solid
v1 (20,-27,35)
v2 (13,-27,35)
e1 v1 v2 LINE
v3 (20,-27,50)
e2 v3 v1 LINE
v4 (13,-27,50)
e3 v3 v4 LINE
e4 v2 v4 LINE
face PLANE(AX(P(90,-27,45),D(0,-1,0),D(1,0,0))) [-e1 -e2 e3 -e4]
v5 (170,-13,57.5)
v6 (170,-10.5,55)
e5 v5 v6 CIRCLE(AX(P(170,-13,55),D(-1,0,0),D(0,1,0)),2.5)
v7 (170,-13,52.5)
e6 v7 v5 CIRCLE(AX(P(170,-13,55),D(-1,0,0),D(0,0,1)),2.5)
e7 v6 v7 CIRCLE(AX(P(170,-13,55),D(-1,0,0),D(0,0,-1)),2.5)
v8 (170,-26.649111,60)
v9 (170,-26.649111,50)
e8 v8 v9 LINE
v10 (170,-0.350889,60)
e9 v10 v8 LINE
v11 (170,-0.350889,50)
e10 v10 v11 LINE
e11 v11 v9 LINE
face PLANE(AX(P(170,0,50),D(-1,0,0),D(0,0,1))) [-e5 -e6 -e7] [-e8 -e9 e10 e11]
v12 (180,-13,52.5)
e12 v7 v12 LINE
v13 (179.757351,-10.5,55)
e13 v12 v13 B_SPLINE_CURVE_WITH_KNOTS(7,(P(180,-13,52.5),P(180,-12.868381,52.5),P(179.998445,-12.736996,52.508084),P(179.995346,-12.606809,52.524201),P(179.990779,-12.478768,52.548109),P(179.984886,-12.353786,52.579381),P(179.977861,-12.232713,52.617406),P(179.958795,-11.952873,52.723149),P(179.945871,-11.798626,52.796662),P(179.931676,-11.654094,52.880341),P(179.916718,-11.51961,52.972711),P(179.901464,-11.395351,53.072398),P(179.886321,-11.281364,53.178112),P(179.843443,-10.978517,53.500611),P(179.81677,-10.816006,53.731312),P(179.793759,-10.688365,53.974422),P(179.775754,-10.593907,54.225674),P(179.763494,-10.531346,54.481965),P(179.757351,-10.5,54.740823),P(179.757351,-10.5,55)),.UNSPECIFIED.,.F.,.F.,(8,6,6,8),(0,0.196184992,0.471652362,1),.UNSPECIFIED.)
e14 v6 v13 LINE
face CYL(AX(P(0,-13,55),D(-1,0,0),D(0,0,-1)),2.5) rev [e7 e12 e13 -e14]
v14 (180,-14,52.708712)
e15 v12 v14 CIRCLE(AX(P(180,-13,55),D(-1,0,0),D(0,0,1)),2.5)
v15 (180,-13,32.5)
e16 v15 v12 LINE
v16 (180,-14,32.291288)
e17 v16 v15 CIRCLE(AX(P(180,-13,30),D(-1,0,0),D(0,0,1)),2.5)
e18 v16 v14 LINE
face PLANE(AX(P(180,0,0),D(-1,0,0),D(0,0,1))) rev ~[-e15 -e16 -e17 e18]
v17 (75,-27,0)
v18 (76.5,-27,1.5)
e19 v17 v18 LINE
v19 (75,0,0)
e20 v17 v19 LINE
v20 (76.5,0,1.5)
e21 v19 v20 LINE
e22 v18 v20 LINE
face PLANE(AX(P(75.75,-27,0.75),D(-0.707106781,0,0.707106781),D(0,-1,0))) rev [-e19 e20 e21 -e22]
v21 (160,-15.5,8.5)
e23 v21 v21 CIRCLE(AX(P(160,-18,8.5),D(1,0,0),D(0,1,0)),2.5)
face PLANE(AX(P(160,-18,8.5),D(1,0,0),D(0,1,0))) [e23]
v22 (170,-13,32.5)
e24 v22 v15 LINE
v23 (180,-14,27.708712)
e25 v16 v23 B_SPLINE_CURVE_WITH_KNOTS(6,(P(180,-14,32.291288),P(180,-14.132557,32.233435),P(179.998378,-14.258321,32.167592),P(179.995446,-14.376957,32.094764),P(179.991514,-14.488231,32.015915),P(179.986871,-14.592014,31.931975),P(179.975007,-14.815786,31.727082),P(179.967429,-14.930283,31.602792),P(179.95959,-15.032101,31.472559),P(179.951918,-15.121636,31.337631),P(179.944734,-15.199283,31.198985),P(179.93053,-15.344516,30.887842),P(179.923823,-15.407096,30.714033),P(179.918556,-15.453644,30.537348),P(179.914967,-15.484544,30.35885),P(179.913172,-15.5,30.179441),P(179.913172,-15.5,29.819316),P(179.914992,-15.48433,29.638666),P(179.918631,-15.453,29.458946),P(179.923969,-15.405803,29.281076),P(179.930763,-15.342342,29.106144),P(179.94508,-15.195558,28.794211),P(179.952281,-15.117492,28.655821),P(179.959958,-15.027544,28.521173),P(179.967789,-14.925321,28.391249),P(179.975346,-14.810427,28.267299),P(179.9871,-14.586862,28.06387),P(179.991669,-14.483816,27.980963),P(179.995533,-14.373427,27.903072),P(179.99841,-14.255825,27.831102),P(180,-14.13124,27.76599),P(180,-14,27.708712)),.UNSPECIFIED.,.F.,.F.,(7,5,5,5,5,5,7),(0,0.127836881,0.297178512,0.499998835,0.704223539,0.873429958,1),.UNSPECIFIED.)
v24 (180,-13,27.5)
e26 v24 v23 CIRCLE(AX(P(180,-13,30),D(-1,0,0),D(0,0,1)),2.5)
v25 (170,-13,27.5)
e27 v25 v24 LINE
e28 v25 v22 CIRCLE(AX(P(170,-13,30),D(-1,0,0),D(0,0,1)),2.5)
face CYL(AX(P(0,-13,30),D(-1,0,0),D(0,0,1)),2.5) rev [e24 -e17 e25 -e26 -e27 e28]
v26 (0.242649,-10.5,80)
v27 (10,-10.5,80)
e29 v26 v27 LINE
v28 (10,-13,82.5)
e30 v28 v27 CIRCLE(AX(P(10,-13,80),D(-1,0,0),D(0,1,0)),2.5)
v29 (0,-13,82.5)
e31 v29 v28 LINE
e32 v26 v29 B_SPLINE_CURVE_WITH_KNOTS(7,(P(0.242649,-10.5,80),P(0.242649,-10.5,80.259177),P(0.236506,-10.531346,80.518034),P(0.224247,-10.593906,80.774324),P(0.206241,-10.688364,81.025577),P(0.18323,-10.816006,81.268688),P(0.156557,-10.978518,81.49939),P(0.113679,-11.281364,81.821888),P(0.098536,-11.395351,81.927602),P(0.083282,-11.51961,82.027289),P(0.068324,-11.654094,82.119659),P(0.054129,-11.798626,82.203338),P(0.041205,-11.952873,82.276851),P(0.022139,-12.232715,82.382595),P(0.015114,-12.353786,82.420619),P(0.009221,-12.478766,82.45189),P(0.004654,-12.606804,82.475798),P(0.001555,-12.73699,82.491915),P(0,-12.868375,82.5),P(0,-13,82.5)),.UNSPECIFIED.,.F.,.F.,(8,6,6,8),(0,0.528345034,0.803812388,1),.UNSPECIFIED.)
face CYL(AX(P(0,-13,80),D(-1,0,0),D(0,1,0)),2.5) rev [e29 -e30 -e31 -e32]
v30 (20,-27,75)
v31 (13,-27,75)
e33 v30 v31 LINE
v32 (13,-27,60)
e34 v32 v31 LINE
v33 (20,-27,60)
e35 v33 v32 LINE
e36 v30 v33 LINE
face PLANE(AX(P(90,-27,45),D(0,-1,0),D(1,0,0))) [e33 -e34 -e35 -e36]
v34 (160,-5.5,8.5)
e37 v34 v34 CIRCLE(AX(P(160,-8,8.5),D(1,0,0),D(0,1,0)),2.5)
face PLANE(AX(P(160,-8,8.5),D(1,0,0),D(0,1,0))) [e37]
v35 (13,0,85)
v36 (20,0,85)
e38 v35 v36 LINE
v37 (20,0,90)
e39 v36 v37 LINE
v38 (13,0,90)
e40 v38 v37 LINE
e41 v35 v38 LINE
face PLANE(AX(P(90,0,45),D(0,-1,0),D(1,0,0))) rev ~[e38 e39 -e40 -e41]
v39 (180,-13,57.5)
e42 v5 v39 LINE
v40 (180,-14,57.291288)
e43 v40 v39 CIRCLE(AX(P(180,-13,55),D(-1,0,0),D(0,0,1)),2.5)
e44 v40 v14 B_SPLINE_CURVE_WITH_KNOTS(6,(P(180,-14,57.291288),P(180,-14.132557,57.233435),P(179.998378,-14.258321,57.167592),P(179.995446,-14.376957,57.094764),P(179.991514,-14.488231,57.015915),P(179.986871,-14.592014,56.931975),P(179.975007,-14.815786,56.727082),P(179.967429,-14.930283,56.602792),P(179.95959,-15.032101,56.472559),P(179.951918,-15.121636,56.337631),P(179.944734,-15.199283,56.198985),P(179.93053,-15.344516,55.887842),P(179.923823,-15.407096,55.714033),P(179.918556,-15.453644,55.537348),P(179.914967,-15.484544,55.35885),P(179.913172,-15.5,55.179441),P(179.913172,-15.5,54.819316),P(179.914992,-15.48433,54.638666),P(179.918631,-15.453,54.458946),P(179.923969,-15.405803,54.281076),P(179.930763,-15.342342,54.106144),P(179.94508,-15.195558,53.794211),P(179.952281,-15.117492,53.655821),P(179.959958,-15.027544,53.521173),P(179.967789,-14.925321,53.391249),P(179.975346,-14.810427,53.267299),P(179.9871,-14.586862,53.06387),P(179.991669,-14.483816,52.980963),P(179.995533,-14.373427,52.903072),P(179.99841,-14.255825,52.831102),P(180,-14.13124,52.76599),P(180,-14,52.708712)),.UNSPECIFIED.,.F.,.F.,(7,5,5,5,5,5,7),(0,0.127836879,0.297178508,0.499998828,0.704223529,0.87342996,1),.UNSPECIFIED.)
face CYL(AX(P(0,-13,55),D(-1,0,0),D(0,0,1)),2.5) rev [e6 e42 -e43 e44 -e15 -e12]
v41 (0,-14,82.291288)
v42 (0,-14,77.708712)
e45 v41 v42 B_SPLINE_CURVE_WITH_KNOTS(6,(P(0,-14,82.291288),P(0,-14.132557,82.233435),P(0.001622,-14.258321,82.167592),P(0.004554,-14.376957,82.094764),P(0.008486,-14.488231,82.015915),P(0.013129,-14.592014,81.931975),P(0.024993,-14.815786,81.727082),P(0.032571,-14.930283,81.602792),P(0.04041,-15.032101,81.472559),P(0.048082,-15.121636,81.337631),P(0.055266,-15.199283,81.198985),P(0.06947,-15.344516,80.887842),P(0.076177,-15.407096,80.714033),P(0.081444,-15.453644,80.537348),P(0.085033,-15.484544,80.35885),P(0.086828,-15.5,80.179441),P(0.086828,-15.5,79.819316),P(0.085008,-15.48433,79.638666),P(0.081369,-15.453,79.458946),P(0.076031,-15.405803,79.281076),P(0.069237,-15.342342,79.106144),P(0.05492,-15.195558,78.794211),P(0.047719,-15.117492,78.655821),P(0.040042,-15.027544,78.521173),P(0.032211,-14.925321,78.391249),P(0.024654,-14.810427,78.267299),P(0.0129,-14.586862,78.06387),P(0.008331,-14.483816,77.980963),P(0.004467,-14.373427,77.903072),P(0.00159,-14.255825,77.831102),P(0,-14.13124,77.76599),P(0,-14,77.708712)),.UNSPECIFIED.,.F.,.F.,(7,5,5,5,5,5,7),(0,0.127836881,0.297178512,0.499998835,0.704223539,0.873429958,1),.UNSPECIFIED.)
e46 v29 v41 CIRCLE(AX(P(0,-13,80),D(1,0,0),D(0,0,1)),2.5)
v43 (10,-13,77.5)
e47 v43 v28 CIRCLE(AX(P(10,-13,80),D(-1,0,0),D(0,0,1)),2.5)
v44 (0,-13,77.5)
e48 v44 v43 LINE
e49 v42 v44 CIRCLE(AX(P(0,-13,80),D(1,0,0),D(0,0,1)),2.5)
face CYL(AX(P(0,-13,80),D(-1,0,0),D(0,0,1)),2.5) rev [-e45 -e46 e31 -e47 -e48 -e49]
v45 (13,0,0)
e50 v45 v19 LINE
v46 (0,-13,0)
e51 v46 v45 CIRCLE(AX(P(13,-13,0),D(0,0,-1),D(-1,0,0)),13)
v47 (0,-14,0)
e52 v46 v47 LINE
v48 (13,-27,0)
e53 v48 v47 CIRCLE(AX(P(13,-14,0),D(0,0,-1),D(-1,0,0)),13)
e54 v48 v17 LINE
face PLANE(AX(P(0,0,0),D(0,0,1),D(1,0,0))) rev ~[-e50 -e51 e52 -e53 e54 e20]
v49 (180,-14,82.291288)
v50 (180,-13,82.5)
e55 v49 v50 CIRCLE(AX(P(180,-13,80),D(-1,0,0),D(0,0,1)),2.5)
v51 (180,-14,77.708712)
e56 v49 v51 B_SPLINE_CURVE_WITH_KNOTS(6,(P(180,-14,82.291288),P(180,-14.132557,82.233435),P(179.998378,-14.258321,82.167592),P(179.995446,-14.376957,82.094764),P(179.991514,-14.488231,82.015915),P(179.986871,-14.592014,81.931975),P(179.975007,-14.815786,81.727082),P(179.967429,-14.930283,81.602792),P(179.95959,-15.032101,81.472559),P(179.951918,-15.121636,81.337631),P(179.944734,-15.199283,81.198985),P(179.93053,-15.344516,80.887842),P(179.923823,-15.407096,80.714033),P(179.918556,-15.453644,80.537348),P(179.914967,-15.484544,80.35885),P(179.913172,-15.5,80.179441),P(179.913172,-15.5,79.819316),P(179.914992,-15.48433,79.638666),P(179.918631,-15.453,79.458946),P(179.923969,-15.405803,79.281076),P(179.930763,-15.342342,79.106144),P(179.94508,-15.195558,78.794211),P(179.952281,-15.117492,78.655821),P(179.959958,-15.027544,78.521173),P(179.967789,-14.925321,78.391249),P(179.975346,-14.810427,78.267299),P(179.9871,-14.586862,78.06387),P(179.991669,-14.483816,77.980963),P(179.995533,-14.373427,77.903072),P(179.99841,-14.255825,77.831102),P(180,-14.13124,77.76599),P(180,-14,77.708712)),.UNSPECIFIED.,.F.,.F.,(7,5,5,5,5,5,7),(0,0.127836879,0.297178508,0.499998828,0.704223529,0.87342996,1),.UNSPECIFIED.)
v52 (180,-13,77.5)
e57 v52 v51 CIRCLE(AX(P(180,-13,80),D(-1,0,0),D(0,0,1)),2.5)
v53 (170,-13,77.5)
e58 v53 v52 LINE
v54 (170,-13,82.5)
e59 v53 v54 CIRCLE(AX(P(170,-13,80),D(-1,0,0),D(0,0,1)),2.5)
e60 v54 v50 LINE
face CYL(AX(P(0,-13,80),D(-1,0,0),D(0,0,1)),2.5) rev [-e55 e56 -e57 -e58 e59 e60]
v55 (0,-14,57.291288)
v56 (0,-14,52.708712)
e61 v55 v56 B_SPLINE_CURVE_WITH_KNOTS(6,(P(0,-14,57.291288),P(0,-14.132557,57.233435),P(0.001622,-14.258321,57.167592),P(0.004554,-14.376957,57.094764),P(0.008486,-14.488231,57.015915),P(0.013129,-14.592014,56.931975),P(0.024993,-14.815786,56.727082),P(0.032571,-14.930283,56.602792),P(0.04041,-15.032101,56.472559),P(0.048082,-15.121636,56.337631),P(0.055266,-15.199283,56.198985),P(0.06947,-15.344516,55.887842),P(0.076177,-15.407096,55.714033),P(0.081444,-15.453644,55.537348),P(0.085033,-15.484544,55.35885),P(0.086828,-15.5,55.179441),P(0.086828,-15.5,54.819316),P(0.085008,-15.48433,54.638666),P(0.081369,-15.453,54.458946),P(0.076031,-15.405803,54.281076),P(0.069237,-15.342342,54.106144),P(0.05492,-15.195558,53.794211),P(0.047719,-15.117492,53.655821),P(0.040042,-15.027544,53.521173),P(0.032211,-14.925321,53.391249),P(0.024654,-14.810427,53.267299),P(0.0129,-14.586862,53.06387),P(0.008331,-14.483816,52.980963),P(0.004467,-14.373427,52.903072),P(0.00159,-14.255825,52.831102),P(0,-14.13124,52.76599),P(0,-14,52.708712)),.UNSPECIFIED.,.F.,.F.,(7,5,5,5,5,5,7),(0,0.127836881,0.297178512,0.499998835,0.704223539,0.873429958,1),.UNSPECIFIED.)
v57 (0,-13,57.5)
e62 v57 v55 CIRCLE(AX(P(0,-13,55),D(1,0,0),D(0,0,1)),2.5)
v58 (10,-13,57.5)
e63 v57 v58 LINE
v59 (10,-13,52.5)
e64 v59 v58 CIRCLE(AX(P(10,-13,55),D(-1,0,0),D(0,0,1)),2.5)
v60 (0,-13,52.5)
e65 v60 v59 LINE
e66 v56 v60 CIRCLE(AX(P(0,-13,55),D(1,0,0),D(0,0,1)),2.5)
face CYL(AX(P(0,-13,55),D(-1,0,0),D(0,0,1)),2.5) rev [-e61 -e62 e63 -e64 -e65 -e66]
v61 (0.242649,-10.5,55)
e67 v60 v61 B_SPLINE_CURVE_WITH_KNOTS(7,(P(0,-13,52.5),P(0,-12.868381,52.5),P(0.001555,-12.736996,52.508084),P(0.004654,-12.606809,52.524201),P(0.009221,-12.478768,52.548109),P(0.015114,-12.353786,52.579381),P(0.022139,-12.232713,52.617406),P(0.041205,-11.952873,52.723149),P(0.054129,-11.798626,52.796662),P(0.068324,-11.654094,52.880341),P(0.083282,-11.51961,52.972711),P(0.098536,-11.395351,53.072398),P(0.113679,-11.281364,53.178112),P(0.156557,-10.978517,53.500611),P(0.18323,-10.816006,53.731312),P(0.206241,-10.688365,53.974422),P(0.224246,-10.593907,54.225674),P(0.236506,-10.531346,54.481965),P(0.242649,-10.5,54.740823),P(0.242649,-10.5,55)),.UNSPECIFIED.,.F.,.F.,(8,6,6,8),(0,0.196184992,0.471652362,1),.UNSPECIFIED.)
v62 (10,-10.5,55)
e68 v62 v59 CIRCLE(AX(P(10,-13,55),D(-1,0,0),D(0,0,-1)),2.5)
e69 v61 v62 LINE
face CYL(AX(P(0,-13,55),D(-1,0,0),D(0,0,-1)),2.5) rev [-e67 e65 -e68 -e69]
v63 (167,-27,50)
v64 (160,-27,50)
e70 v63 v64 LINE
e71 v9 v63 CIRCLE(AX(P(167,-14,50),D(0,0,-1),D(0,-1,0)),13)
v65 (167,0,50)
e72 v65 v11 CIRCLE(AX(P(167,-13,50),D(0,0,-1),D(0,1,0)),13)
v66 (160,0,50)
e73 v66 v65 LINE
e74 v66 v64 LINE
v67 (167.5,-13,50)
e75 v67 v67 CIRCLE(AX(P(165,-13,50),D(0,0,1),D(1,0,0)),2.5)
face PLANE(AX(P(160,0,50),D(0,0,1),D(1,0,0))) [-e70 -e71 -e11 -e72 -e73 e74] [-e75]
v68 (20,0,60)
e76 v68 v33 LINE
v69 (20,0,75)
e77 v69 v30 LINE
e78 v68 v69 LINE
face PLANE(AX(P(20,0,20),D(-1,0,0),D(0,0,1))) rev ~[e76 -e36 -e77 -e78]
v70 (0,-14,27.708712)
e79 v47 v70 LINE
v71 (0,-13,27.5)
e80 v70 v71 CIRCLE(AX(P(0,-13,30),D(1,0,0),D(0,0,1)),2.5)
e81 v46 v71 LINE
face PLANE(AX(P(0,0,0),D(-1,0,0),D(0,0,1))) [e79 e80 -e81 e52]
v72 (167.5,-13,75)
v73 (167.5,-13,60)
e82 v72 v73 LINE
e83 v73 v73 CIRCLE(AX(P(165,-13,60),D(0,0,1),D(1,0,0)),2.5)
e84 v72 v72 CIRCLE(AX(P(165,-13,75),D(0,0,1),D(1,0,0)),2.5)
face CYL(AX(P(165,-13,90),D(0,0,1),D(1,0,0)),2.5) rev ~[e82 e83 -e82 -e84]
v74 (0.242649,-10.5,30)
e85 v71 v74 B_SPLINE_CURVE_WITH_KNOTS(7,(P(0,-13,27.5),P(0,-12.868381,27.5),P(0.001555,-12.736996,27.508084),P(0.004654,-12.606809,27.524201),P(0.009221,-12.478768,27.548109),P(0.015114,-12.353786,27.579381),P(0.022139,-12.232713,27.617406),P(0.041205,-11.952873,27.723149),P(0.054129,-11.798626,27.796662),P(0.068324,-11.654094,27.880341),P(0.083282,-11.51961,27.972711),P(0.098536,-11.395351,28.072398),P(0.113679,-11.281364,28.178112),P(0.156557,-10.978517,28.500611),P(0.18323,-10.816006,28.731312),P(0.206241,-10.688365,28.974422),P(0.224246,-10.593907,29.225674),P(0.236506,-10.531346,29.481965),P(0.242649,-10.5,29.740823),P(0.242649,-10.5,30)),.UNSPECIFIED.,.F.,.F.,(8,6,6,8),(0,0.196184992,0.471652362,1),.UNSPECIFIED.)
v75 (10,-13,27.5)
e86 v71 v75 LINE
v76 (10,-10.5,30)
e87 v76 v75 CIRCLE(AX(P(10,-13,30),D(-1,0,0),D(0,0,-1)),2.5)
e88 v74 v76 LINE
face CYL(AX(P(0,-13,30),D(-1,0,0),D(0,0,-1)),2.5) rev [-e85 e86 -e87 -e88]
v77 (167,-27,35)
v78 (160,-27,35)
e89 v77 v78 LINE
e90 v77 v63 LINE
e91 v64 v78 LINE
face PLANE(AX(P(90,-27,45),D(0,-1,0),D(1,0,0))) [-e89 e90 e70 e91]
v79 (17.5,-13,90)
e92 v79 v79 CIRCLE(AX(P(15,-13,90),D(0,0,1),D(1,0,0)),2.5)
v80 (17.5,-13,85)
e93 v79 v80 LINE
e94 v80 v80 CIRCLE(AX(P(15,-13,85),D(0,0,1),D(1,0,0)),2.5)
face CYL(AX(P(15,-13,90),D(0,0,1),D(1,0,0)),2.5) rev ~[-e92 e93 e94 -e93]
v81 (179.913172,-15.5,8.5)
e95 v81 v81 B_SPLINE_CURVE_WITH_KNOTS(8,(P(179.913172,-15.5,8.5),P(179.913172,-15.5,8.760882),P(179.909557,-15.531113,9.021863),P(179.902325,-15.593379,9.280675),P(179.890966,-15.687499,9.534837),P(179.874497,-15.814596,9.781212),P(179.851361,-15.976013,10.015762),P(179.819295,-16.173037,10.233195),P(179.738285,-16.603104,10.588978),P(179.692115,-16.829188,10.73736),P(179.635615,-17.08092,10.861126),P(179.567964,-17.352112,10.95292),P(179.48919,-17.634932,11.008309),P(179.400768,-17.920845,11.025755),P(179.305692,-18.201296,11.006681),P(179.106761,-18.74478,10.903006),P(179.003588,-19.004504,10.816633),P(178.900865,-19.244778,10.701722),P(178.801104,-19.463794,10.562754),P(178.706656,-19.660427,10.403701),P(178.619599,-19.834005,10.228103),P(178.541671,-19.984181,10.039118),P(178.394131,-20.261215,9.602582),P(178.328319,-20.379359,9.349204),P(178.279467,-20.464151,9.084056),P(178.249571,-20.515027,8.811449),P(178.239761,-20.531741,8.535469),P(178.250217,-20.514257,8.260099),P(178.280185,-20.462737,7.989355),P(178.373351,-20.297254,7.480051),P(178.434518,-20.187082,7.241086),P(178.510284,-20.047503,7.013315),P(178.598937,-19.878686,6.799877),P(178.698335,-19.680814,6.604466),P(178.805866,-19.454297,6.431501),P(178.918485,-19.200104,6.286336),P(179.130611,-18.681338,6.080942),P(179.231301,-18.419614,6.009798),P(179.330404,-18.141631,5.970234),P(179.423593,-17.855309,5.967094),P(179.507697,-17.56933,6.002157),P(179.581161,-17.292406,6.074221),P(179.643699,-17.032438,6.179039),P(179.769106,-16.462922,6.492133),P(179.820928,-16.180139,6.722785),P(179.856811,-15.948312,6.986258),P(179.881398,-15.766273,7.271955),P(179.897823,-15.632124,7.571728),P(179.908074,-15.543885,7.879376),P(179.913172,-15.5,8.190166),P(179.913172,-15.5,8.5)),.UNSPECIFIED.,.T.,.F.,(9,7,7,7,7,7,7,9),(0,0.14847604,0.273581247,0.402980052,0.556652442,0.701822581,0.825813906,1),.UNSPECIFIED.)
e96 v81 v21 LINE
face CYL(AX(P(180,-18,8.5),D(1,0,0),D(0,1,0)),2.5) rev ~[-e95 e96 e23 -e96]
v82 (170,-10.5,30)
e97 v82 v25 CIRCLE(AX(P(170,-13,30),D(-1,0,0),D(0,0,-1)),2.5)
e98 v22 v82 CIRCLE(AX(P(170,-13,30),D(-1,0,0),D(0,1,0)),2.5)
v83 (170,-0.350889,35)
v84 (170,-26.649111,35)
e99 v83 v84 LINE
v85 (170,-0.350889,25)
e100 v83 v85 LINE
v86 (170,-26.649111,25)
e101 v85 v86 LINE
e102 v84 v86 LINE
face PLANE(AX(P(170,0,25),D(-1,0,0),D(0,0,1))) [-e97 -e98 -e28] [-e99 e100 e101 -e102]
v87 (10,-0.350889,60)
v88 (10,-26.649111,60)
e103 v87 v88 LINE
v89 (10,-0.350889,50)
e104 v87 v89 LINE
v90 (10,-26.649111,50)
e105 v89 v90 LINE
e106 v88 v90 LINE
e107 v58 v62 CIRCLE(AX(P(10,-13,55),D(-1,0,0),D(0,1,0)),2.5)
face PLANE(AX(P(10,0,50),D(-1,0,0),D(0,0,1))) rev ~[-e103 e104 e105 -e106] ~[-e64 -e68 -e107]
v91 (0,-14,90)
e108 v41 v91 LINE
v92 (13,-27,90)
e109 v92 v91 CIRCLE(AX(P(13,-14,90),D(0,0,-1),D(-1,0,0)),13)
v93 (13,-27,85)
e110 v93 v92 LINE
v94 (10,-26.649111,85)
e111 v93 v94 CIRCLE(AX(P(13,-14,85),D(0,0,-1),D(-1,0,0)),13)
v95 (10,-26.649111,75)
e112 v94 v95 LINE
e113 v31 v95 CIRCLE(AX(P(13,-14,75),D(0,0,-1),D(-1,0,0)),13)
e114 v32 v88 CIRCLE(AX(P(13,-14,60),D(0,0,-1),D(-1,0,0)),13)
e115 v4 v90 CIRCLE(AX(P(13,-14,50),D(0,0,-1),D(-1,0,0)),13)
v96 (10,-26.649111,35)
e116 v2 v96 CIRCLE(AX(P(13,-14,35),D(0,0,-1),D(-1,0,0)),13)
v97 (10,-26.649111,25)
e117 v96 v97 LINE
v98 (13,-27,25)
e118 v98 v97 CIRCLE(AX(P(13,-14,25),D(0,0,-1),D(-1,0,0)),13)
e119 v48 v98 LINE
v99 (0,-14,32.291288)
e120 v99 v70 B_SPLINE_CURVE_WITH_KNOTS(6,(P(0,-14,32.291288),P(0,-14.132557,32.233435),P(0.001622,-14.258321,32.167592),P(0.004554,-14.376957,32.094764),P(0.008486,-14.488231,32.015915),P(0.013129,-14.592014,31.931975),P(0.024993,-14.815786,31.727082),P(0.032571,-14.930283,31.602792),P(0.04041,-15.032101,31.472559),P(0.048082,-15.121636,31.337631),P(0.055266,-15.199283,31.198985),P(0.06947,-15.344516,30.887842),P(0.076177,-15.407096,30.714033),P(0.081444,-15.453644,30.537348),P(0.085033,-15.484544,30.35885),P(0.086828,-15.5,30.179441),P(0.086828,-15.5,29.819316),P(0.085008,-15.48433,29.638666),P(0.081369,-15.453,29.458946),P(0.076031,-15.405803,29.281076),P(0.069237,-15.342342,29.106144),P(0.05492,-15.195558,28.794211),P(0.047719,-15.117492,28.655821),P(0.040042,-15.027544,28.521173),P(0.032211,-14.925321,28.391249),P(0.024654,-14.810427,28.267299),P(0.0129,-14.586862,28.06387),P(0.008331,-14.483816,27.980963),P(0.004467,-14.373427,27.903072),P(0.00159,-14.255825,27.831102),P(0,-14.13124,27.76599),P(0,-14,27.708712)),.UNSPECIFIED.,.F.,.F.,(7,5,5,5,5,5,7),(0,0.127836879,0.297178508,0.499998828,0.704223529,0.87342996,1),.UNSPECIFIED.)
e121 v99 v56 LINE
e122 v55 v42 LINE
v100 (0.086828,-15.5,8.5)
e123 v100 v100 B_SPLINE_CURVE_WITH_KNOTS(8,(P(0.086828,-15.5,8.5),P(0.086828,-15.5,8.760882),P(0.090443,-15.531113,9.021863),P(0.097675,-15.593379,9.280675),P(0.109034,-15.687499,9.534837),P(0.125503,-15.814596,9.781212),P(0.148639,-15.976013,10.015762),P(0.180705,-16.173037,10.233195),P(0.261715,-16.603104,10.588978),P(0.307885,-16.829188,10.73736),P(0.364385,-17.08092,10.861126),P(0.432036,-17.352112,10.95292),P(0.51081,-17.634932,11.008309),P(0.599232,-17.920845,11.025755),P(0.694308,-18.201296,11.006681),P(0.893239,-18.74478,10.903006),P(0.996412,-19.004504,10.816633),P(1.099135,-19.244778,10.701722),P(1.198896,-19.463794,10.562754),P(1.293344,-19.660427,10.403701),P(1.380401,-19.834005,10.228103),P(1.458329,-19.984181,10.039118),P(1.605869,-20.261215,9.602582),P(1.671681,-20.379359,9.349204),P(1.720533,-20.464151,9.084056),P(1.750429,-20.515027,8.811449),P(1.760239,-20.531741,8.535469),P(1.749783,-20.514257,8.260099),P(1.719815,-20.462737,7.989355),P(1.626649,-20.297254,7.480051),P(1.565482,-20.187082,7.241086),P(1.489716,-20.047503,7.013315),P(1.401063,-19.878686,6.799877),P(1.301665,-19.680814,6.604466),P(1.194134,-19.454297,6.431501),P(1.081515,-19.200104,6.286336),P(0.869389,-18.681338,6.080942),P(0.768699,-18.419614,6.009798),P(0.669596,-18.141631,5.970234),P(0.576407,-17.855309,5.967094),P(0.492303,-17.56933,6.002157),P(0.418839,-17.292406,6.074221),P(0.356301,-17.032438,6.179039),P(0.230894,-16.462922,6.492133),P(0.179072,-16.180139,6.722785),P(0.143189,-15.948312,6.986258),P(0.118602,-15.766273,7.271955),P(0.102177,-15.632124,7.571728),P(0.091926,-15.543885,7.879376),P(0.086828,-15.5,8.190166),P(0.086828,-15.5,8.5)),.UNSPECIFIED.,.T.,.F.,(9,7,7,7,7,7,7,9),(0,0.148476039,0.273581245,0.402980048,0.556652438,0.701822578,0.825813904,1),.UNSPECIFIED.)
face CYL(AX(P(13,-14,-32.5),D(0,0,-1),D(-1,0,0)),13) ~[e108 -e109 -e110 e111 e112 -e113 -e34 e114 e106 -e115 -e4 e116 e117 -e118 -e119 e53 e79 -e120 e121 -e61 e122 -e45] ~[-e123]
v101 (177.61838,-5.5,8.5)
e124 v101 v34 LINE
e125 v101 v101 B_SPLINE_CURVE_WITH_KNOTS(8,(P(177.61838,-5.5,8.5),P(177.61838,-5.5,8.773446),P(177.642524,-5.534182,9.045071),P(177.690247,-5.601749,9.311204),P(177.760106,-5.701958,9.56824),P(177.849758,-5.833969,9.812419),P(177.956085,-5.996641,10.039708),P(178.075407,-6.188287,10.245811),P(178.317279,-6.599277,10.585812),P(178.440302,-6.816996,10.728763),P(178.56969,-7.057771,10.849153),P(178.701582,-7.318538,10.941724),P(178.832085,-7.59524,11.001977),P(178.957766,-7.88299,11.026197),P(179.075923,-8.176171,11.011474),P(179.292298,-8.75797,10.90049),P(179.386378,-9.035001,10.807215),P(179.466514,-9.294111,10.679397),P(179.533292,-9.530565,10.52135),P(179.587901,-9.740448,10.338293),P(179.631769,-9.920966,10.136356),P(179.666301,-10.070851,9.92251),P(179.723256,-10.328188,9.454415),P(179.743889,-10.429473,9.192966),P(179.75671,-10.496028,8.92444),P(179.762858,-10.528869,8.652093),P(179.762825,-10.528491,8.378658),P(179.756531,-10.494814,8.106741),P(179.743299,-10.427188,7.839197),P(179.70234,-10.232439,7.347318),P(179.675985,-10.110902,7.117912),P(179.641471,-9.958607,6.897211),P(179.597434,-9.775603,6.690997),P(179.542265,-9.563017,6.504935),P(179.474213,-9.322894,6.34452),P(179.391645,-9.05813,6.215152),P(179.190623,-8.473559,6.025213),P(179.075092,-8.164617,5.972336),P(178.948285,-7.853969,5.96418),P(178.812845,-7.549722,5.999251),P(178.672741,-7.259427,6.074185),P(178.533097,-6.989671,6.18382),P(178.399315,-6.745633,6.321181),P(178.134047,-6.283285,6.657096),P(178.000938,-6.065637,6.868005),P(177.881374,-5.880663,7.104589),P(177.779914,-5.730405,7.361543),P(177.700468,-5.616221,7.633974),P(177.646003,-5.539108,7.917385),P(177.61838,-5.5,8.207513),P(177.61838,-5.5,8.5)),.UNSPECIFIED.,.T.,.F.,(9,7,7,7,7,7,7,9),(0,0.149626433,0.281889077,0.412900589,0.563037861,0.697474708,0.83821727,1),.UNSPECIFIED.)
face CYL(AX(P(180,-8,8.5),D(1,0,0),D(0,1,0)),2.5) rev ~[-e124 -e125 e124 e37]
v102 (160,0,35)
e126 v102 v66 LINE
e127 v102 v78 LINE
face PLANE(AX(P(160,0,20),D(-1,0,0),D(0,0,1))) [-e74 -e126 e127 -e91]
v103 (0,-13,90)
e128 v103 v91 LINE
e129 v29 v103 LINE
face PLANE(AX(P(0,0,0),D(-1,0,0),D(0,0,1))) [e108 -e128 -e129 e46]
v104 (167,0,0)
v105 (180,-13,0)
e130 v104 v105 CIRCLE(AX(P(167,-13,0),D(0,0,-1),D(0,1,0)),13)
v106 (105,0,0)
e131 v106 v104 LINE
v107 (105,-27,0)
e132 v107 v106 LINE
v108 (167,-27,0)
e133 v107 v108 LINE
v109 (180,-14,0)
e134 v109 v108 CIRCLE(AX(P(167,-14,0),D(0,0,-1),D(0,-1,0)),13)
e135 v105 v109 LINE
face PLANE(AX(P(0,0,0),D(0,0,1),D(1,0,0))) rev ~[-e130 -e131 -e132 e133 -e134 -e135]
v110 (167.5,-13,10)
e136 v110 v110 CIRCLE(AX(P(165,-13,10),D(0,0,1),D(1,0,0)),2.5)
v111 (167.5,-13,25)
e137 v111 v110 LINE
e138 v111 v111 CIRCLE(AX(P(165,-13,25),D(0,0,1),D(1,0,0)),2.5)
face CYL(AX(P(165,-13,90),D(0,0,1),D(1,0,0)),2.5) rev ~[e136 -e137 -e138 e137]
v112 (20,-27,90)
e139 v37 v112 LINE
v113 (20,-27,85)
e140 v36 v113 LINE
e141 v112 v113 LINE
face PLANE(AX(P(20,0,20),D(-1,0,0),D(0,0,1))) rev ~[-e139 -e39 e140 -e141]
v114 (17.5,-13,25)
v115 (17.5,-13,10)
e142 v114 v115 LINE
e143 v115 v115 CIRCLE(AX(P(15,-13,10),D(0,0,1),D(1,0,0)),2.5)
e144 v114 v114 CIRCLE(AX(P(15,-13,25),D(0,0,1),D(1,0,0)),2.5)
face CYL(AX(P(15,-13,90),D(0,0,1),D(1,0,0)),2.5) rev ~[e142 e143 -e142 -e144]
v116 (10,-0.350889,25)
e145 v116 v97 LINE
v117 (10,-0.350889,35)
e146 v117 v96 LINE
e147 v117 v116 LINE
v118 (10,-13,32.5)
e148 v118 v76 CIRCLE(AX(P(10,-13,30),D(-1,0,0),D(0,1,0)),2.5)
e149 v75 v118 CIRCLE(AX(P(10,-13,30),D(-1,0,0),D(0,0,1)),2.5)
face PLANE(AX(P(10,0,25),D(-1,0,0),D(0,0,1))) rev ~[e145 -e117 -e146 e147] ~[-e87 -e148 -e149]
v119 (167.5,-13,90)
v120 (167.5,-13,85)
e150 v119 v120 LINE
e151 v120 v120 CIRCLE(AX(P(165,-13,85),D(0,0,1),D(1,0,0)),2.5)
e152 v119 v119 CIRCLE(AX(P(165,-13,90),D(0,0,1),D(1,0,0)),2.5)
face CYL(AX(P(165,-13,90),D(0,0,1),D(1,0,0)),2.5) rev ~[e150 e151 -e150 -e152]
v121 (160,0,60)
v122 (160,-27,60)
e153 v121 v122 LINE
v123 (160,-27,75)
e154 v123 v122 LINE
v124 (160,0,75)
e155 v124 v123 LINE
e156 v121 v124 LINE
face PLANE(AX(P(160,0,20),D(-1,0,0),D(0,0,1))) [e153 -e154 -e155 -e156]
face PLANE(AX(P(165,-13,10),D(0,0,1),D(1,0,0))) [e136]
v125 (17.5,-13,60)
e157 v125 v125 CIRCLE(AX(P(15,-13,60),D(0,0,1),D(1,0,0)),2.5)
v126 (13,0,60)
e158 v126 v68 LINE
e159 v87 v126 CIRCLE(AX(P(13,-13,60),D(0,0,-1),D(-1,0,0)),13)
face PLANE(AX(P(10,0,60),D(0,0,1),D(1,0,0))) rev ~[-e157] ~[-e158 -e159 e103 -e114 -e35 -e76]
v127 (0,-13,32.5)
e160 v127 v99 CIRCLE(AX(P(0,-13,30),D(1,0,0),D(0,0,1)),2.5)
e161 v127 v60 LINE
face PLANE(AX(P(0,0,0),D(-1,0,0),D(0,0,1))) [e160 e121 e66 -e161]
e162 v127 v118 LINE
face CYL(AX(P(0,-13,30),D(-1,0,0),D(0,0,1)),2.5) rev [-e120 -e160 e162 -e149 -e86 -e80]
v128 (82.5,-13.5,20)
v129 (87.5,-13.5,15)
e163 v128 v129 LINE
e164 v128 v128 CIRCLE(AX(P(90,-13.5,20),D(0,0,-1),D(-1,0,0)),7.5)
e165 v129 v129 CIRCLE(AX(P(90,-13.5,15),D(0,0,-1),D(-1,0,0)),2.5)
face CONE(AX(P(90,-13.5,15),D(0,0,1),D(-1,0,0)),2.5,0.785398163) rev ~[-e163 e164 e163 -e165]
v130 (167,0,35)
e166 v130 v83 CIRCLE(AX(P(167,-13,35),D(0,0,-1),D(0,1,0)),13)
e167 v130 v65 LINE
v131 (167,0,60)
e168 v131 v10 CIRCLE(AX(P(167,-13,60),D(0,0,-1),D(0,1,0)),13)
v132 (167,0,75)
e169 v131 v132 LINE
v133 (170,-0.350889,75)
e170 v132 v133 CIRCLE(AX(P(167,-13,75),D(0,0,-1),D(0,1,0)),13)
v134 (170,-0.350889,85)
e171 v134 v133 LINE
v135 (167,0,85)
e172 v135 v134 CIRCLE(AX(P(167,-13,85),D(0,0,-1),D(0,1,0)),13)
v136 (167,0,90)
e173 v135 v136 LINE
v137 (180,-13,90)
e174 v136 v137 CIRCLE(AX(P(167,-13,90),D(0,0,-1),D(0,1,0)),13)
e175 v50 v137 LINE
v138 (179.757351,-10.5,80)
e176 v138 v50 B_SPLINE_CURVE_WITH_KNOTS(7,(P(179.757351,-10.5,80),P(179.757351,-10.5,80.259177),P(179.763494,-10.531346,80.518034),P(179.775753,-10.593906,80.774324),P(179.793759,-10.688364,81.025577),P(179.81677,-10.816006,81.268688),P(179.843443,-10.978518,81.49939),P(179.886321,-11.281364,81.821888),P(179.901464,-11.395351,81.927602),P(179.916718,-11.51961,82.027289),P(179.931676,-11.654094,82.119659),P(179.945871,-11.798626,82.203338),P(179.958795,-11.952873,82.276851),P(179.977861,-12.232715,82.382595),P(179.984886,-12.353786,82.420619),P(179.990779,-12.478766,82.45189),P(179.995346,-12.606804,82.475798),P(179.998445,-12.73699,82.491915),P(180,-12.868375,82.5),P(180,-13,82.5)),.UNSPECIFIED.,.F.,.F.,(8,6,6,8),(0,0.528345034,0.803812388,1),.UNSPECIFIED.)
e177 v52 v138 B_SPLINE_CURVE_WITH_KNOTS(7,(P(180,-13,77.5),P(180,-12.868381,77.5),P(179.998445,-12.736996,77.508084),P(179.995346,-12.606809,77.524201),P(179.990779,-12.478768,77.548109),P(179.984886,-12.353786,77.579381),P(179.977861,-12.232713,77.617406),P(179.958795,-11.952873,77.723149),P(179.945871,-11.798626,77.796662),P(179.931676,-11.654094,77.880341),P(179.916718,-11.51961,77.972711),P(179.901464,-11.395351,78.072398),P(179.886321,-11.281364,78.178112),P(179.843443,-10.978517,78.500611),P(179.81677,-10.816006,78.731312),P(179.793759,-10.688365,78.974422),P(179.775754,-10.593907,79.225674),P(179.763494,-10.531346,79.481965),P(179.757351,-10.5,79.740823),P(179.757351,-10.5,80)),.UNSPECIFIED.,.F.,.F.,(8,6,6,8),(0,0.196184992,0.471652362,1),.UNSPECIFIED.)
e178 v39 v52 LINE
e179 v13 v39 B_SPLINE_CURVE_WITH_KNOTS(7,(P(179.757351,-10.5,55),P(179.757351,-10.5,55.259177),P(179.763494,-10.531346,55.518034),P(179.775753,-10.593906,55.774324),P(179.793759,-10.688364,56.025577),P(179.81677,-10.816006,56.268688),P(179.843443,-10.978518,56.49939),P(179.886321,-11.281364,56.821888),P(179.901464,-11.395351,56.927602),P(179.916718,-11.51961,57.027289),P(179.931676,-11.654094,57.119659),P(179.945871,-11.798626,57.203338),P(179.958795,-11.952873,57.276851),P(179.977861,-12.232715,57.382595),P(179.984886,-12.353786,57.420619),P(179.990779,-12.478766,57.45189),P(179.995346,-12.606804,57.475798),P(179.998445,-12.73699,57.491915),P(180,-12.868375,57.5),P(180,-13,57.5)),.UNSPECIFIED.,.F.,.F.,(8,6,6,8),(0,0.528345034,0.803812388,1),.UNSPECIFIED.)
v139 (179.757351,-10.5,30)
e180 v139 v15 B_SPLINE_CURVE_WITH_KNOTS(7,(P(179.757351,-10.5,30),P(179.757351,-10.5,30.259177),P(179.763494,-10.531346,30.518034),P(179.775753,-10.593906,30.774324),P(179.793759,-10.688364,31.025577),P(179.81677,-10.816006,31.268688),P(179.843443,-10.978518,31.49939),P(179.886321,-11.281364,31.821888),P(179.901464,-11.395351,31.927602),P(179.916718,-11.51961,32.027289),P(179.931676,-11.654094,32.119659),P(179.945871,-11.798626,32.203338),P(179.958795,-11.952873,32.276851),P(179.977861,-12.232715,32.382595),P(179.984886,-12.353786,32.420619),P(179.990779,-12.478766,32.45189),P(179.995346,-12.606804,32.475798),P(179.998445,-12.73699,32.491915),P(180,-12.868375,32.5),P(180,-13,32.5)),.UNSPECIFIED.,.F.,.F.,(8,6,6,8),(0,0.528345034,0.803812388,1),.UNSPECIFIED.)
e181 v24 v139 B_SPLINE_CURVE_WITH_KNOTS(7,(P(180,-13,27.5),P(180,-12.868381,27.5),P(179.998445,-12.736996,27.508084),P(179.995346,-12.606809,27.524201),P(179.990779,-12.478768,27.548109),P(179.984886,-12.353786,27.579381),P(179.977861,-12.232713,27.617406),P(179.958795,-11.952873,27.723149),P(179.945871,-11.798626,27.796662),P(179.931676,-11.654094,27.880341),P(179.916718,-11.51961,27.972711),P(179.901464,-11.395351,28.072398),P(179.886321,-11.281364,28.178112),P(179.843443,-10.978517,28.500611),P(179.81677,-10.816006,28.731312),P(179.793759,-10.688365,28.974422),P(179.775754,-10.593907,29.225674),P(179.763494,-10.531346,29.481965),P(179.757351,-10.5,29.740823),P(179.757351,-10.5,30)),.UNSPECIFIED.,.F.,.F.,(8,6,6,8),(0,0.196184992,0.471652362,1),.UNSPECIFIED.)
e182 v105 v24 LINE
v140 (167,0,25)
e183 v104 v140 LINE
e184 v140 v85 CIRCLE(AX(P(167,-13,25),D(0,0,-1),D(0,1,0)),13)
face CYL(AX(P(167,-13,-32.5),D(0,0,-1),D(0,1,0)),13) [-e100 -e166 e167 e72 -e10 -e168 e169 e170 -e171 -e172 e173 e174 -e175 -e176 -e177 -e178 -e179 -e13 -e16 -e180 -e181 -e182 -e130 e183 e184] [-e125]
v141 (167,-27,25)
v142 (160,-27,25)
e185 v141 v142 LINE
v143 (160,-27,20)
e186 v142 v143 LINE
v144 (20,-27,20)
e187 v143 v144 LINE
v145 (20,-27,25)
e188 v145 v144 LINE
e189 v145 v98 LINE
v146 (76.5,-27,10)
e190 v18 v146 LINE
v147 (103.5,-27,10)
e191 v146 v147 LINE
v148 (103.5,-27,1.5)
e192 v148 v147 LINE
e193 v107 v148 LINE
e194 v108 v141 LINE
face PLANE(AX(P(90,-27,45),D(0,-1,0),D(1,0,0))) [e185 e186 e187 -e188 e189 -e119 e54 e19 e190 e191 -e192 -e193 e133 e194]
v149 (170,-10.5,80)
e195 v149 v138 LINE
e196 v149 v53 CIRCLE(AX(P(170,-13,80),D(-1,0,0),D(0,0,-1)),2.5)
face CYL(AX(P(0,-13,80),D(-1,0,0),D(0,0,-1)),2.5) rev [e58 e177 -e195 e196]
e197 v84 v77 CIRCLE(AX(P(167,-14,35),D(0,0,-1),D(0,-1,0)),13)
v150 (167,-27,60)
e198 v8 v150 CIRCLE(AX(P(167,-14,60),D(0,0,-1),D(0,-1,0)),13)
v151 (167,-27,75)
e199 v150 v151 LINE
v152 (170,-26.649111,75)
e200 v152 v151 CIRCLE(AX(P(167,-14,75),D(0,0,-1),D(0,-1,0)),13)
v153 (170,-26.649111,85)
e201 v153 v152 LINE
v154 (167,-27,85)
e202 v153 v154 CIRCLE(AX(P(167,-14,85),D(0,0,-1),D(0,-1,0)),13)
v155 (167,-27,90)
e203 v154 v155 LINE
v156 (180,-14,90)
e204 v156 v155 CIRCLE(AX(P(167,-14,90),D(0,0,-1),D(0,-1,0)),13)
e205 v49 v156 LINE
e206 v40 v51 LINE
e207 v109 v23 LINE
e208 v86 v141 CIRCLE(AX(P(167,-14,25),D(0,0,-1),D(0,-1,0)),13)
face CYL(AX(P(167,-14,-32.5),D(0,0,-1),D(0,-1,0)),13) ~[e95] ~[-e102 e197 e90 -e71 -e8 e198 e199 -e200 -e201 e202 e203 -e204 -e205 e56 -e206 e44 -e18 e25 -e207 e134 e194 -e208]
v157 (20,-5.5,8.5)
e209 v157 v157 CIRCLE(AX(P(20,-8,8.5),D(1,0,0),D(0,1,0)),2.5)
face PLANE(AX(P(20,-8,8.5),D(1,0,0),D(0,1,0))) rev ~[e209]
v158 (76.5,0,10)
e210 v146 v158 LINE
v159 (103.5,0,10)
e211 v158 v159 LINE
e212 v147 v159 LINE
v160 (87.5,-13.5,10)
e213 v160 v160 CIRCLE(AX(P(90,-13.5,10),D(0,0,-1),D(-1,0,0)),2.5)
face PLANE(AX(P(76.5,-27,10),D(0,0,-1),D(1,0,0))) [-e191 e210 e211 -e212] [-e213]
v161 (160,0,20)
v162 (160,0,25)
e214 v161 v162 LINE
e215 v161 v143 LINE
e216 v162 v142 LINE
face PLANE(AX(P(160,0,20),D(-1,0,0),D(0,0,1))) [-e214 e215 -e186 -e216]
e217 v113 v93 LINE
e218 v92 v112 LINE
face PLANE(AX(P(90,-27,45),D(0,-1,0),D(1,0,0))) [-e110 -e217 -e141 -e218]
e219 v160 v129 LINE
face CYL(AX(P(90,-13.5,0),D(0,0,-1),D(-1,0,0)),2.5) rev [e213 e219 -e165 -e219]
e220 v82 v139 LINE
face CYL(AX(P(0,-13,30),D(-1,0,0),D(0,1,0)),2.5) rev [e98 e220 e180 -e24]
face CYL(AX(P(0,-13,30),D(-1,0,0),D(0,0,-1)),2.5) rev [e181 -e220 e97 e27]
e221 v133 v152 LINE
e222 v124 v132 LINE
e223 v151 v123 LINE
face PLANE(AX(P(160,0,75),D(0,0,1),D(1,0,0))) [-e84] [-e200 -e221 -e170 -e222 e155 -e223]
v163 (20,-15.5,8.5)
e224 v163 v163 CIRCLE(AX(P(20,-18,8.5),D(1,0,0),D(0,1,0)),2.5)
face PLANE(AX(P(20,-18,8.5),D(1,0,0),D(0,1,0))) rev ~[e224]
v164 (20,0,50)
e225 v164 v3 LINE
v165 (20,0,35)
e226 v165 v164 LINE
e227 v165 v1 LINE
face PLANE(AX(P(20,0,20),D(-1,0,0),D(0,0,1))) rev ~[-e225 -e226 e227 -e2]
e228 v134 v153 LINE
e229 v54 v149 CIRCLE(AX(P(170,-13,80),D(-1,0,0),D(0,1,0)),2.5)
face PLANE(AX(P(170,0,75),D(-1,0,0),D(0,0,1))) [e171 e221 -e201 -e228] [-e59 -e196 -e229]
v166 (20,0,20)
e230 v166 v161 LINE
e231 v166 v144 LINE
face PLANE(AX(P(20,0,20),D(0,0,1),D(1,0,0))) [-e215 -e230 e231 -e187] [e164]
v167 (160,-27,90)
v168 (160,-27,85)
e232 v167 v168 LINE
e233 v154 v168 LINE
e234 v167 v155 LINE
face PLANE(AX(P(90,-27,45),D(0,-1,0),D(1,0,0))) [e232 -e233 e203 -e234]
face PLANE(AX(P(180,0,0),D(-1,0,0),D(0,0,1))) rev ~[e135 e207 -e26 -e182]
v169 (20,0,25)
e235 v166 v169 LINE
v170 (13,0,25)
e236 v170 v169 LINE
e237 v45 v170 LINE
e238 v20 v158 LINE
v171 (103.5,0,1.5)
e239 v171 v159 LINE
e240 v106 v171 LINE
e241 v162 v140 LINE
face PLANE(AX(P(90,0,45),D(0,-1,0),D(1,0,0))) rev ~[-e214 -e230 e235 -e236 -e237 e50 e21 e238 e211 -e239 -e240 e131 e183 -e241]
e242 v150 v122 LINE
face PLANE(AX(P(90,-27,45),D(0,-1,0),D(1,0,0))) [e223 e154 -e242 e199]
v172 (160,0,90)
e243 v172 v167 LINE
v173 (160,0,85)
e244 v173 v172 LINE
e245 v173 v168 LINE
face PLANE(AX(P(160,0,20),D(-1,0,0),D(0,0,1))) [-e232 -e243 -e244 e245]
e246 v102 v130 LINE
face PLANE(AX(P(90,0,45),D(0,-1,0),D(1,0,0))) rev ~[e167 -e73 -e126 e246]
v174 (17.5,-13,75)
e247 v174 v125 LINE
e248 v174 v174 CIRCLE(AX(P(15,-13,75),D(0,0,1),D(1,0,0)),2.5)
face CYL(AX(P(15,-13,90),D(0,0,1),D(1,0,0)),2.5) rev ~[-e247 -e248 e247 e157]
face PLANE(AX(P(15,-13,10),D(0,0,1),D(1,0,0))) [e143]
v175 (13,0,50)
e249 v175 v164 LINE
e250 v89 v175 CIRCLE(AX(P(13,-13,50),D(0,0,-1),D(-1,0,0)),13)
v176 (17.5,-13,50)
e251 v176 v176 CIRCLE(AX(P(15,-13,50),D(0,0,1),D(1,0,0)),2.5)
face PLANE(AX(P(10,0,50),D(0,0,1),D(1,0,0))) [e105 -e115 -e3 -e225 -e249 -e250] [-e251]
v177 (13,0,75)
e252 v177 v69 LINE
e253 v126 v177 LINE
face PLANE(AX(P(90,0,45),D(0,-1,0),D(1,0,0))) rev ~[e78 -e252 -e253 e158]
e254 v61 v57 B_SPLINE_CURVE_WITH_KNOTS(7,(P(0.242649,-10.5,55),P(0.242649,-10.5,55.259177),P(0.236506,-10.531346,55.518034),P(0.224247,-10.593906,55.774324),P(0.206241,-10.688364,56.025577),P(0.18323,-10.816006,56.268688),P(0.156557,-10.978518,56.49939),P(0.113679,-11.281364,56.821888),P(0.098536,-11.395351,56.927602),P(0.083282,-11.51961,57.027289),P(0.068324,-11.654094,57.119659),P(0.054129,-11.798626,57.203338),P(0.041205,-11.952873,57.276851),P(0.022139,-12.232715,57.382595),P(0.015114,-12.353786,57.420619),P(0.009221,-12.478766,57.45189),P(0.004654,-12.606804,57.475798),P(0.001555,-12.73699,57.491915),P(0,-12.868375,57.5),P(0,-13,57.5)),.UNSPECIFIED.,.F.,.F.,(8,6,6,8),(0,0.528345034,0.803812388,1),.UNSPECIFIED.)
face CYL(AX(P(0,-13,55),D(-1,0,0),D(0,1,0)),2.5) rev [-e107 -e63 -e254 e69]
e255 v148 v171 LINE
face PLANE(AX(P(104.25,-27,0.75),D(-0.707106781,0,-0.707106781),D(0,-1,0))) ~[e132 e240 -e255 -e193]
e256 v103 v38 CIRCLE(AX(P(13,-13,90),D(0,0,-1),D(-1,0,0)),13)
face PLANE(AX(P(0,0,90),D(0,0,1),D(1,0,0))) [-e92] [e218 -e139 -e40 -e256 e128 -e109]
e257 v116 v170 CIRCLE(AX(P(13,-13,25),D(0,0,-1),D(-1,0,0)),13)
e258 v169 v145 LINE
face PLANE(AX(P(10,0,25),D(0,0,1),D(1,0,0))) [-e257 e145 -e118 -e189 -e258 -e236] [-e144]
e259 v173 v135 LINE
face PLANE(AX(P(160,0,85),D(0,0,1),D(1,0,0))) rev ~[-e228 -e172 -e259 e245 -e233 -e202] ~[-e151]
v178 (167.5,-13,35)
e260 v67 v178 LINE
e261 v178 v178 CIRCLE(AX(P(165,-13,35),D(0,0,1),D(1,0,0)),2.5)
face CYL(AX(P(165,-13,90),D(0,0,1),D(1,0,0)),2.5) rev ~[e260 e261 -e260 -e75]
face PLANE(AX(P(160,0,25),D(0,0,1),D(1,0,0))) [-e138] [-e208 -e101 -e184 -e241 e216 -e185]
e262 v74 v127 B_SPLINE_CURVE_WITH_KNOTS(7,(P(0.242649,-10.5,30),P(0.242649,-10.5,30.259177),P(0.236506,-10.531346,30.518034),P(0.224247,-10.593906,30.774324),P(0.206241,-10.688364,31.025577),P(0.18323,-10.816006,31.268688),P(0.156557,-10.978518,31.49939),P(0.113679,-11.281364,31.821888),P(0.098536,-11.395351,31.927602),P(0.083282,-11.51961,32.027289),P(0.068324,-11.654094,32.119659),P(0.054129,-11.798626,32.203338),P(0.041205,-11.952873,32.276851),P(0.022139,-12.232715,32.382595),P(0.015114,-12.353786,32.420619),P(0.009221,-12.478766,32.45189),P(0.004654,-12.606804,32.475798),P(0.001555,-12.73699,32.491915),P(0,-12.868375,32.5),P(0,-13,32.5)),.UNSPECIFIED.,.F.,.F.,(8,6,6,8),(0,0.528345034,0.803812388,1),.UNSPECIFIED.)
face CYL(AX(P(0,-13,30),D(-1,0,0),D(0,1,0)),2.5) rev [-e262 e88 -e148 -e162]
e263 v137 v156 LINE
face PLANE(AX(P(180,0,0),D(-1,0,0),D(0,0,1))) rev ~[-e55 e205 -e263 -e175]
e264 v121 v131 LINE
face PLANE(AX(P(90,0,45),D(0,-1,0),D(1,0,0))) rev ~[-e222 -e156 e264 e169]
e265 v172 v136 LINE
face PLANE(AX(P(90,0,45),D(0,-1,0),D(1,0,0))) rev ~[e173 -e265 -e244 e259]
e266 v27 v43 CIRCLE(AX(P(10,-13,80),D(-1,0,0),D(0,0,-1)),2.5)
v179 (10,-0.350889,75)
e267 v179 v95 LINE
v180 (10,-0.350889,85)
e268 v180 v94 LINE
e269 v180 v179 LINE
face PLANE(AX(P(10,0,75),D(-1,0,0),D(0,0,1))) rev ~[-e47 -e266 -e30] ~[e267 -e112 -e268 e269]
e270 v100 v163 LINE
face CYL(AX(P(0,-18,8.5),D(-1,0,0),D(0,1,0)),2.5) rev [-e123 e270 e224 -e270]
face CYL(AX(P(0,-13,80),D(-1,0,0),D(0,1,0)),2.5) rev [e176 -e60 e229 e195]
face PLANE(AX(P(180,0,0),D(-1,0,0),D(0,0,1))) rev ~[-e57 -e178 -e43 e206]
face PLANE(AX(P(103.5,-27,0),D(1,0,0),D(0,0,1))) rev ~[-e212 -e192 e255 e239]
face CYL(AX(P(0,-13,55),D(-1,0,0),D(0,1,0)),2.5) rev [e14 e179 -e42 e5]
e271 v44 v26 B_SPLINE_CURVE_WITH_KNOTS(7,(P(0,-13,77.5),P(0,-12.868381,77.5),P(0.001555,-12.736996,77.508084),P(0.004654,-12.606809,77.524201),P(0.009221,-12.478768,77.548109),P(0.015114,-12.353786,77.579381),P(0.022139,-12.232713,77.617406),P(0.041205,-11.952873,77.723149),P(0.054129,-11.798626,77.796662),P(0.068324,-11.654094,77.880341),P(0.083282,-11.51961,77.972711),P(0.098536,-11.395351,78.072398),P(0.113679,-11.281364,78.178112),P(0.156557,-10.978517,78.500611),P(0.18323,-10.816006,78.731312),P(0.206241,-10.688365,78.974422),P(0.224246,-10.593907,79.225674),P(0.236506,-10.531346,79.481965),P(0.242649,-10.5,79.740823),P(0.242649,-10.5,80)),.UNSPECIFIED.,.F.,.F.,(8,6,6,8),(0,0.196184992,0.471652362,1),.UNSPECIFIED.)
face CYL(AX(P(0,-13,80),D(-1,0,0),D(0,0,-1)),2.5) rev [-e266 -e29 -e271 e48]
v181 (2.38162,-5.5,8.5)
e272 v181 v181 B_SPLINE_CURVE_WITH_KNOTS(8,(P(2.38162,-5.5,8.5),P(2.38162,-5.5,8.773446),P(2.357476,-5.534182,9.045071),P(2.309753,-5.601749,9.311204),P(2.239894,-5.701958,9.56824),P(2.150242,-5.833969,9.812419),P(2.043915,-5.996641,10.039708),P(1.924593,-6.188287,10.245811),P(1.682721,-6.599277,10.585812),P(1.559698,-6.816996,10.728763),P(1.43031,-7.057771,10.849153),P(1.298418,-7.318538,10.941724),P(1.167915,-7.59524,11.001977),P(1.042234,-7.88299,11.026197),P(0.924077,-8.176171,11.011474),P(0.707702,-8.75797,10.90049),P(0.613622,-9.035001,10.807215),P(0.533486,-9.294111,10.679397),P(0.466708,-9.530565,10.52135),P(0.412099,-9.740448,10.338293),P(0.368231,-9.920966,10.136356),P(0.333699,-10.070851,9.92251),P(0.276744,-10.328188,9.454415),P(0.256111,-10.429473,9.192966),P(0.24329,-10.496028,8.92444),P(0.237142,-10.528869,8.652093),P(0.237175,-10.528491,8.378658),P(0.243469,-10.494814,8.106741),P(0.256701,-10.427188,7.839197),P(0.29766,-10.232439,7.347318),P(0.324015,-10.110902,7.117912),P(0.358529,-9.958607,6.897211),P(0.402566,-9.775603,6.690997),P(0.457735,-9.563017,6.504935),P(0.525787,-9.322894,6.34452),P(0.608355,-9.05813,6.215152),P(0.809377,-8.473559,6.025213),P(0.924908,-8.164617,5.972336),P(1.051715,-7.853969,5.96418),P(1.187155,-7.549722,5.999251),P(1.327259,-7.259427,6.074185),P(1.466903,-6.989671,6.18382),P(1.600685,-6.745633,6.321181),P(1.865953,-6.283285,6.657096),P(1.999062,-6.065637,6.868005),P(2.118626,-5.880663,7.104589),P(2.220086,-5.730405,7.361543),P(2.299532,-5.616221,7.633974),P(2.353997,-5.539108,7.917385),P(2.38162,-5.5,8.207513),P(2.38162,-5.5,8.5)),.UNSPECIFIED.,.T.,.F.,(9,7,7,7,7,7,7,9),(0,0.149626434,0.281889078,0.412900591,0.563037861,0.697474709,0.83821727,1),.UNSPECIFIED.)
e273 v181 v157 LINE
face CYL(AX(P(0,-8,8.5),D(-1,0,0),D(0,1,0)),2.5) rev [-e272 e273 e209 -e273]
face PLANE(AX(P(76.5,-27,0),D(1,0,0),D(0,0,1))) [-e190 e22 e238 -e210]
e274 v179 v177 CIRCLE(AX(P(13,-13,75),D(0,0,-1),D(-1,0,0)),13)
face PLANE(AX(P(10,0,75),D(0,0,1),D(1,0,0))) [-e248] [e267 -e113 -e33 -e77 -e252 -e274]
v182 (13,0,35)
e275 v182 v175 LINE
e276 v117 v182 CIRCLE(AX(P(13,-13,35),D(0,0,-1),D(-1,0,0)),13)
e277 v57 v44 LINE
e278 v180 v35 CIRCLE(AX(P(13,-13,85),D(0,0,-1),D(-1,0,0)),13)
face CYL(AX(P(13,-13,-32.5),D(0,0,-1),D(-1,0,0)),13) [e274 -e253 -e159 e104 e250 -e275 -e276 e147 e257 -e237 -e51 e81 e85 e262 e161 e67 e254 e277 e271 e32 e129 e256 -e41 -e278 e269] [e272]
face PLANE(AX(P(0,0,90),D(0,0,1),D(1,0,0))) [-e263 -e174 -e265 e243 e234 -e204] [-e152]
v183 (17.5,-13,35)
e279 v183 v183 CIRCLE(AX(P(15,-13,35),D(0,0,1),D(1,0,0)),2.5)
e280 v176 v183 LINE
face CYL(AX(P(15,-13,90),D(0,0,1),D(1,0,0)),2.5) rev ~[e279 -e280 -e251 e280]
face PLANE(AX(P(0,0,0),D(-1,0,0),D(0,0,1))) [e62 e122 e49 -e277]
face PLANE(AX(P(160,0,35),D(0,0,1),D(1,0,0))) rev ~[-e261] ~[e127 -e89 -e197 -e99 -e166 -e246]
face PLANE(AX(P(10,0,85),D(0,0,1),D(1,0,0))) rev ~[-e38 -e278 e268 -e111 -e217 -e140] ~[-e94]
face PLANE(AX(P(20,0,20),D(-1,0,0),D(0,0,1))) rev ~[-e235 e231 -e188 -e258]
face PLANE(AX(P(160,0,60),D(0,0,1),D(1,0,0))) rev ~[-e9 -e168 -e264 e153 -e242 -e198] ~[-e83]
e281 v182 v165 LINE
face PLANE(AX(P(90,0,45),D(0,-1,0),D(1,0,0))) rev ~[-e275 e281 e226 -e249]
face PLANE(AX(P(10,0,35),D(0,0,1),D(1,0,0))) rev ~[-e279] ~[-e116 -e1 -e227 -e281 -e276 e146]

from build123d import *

# Parameters (mm, degrees)
F0_W         = 180
F0_H         = 90
F1_DEPTH     = 27
F2_W         = 140
F2_H         = 70
F3_DEPTH     = 27.001
F4_W         = 10
F4_H         = 10
F5_DEPTH     = 27.001
F6_R         = 2.5
F7_DEPTH     = 80
F9_DEPTH     = 180.001
F10_R        = 2.5
F11_DEPTH    = 20
F12_R        = 2.5
F13_DEPTH    = 20
F14_T1_DEPTH = 155
F15_W        = 27
F15_H        = 10
F16_DEPTH    = 27.0010001
F18_DEPTH    = 90.0010001
F19_SIZE     = 1.5
F20_SIZE     = 5


# Not quite as in the source:
# - a fillet or chamfer that OpenCascade refuses, or shapes differently, is made with other operations: its cross-section is extruded or revolved along the edge and cut away or added


with BuildPart() as f1:
    # F0 (on Front) → F1 (new body)
    with BuildSketch(Plane.XZ):
        with Locations((90, 45)):
            Rectangle(F0_W, F0_H)
    extrude(amount=F1_DEPTH)

    # F2 (on Front) → F3 (cut, through all)
    with BuildSketch(Plane.XZ):
        with Locations((90, 55)):
            Rectangle(F2_W, F2_H)
    extrude(amount=F3_DEPTH, mode=Mode.SUBTRACT)

    # F4 (on Front) → F5 (cut, through all)
    with BuildSketch(Plane.XZ):
        with Locations((165, 80)):
            Rectangle(F4_W, F4_H)
        with Locations((165, 55)):
            Rectangle(F4_W, F4_H)
        with Locations((165, 30)):
            Rectangle(F4_W, F4_H)
        with Locations((15, 30)):
            Rectangle(F4_W, F4_H)
        with Locations((15, 55)):
            Rectangle(F4_W, F4_H)
        with Locations((15, 80)):
            Rectangle(F4_W, F4_H)
    extrude(amount=F5_DEPTH, mode=Mode.SUBTRACT)

    # F6 (on face) → F7 (cut)
    with BuildSketch(Plane.XY.offset(90)):
        with Locations((165, -13)):
            Circle(F6_R)
        with Locations((15, -13)):
            Circle(F6_R)
    extrude(amount=-F7_DEPTH, mode=Mode.SUBTRACT)

    # F8 (on Right) → F9 (cut, through all)
    with BuildSketch(Plane.YZ):
        with BuildLine():
            Line((-13, 77.5), (-13, 82.5))
            ThreePointArc((-13, 82.5), (-15.5, 80), (-13, 77.5))
        make_face()
        with BuildLine():
            ThreePointArc((-13, 77.5), (-11.232233047, 78.232233047), (-10.5, 80))
            ThreePointArc((-10.5, 80), (-11.232233047, 81.767766953), (-13, 82.5))
            Line((-13, 82.5), (-13, 77.5))
        make_face()
        with BuildLine():
            Line((-13, 52.5), (-13, 57.5))
            ThreePointArc((-13, 57.5), (-15.5, 55), (-13, 52.5))
        make_face()
        with BuildLine():
            ThreePointArc((-10.5, 55), (-11.232233047, 56.767766953), (-13, 57.5))
            Line((-13, 57.5), (-13, 52.5))
            ThreePointArc((-13, 52.5), (-11.232233047, 53.232233047), (-10.5, 55))
        make_face()
        with BuildLine():
            Line((-13, 27.5), (-13, 32.5))
            ThreePointArc((-13, 32.5), (-15.5, 30), (-13, 27.5))
        make_face()
        with BuildLine():
            ThreePointArc((-10.5, 30), (-11.232233047, 31.767766953), (-13, 32.5))
            Line((-13, 32.5), (-13, 27.5))
            ThreePointArc((-13, 27.5), (-11.232233047, 28.232233047), (-10.5, 30))
        make_face()
    extrude(amount=F9_DEPTH, mode=Mode.SUBTRACT)

    # F10 (on Right) → F11 (cut)
    with BuildSketch(Plane.YZ):
        with Locations((-8, 8.5)):
            Circle(F10_R)
        with Locations((-18, 8.5)):
            Circle(F10_R)
    extrude(amount=F11_DEPTH, mode=Mode.SUBTRACT)

    # F12 (on face) → F13 (cut)
    with BuildSketch(Plane.YZ.offset(180)):
        with Locations((-8, 8.5)):
            Circle(F12_R)
        with Locations((-18, 8.5)):
            Circle(F12_R)
    extrude(amount=-F13_DEPTH, mode=Mode.SUBTRACT)

    # F14: fillet of radius 13 on 4 edges, made by hand

    # F14_s2 → F14_t1 (cut)
    with BuildSketch(Plane.XY.offset(-32.5)):
        with BuildLine():
            ThreePointArc((0, -13), (3.8076118446, -3.8076118446), (13, 0))
            Line((13, 0), (0, 0))
            Line((0, 0), (0, -13))
        make_face()
        with BuildLine():
            ThreePointArc((0, -14), (3.8076118446, -23.1923881554), (13, -27))
            Line((13, -27), (0, -27))
            Line((0, -27), (0, -14))
        make_face()
        with BuildLine():
            ThreePointArc((167, -27), (176.1923881554, -23.1923881554), (180, -14))
            Line((180, -14), (180, -27))
            Line((180, -27), (167, -27))
        make_face()
        with BuildLine():
            ThreePointArc((167, 0), (176.1923881554, -3.8076118446), (180, -13))
            Line((180, -13), (180, 0))
            Line((180, 0), (167, 0))
        make_face()
    extrude(amount=F14_T1_DEPTH, mode=Mode.SUBTRACT)

    # F15 (on face) → F16 (cut, through all)
    with BuildSketch(Plane.XZ.offset(27)):
        with Locations((90, 5)):
            Rectangle(F15_W, F15_H)
    extrude(amount=-F16_DEPTH, mode=Mode.SUBTRACT)

    # F17 (on Top) → F18 (cut, through all)
    with BuildSketch(Plane.XY):
        with BuildLine():
            Line((87.5, -13.5), (92.5, -13.5))
            ThreePointArc((92.5, -13.5), (90, -11), (87.5, -13.5))
        make_face()
        with BuildLine():
            ThreePointArc((87.5, -13.5), (90, -16), (92.5, -13.5))
            Line((92.5, -13.5), (87.5, -13.5))
        make_face()
    extrude(amount=F18_DEPTH, mode=Mode.SUBTRACT)

    # F19
    f19_edges = [f1.edges().sort_by_distance(p)[0] for p in [
        (76.5, -13.5, 0),
        (103.5, -13.5, 0),
    ]]
    chamfer(f19_edges, length=F19_SIZE)

    # F20
    f20_edges = [f1.edges().sort_by_distance(p)[0] for p in [
        (92.5, -13.5, 20),
    ]]
    chamfer(f20_edges, length=F20_SIZE)


solid = f1.part
